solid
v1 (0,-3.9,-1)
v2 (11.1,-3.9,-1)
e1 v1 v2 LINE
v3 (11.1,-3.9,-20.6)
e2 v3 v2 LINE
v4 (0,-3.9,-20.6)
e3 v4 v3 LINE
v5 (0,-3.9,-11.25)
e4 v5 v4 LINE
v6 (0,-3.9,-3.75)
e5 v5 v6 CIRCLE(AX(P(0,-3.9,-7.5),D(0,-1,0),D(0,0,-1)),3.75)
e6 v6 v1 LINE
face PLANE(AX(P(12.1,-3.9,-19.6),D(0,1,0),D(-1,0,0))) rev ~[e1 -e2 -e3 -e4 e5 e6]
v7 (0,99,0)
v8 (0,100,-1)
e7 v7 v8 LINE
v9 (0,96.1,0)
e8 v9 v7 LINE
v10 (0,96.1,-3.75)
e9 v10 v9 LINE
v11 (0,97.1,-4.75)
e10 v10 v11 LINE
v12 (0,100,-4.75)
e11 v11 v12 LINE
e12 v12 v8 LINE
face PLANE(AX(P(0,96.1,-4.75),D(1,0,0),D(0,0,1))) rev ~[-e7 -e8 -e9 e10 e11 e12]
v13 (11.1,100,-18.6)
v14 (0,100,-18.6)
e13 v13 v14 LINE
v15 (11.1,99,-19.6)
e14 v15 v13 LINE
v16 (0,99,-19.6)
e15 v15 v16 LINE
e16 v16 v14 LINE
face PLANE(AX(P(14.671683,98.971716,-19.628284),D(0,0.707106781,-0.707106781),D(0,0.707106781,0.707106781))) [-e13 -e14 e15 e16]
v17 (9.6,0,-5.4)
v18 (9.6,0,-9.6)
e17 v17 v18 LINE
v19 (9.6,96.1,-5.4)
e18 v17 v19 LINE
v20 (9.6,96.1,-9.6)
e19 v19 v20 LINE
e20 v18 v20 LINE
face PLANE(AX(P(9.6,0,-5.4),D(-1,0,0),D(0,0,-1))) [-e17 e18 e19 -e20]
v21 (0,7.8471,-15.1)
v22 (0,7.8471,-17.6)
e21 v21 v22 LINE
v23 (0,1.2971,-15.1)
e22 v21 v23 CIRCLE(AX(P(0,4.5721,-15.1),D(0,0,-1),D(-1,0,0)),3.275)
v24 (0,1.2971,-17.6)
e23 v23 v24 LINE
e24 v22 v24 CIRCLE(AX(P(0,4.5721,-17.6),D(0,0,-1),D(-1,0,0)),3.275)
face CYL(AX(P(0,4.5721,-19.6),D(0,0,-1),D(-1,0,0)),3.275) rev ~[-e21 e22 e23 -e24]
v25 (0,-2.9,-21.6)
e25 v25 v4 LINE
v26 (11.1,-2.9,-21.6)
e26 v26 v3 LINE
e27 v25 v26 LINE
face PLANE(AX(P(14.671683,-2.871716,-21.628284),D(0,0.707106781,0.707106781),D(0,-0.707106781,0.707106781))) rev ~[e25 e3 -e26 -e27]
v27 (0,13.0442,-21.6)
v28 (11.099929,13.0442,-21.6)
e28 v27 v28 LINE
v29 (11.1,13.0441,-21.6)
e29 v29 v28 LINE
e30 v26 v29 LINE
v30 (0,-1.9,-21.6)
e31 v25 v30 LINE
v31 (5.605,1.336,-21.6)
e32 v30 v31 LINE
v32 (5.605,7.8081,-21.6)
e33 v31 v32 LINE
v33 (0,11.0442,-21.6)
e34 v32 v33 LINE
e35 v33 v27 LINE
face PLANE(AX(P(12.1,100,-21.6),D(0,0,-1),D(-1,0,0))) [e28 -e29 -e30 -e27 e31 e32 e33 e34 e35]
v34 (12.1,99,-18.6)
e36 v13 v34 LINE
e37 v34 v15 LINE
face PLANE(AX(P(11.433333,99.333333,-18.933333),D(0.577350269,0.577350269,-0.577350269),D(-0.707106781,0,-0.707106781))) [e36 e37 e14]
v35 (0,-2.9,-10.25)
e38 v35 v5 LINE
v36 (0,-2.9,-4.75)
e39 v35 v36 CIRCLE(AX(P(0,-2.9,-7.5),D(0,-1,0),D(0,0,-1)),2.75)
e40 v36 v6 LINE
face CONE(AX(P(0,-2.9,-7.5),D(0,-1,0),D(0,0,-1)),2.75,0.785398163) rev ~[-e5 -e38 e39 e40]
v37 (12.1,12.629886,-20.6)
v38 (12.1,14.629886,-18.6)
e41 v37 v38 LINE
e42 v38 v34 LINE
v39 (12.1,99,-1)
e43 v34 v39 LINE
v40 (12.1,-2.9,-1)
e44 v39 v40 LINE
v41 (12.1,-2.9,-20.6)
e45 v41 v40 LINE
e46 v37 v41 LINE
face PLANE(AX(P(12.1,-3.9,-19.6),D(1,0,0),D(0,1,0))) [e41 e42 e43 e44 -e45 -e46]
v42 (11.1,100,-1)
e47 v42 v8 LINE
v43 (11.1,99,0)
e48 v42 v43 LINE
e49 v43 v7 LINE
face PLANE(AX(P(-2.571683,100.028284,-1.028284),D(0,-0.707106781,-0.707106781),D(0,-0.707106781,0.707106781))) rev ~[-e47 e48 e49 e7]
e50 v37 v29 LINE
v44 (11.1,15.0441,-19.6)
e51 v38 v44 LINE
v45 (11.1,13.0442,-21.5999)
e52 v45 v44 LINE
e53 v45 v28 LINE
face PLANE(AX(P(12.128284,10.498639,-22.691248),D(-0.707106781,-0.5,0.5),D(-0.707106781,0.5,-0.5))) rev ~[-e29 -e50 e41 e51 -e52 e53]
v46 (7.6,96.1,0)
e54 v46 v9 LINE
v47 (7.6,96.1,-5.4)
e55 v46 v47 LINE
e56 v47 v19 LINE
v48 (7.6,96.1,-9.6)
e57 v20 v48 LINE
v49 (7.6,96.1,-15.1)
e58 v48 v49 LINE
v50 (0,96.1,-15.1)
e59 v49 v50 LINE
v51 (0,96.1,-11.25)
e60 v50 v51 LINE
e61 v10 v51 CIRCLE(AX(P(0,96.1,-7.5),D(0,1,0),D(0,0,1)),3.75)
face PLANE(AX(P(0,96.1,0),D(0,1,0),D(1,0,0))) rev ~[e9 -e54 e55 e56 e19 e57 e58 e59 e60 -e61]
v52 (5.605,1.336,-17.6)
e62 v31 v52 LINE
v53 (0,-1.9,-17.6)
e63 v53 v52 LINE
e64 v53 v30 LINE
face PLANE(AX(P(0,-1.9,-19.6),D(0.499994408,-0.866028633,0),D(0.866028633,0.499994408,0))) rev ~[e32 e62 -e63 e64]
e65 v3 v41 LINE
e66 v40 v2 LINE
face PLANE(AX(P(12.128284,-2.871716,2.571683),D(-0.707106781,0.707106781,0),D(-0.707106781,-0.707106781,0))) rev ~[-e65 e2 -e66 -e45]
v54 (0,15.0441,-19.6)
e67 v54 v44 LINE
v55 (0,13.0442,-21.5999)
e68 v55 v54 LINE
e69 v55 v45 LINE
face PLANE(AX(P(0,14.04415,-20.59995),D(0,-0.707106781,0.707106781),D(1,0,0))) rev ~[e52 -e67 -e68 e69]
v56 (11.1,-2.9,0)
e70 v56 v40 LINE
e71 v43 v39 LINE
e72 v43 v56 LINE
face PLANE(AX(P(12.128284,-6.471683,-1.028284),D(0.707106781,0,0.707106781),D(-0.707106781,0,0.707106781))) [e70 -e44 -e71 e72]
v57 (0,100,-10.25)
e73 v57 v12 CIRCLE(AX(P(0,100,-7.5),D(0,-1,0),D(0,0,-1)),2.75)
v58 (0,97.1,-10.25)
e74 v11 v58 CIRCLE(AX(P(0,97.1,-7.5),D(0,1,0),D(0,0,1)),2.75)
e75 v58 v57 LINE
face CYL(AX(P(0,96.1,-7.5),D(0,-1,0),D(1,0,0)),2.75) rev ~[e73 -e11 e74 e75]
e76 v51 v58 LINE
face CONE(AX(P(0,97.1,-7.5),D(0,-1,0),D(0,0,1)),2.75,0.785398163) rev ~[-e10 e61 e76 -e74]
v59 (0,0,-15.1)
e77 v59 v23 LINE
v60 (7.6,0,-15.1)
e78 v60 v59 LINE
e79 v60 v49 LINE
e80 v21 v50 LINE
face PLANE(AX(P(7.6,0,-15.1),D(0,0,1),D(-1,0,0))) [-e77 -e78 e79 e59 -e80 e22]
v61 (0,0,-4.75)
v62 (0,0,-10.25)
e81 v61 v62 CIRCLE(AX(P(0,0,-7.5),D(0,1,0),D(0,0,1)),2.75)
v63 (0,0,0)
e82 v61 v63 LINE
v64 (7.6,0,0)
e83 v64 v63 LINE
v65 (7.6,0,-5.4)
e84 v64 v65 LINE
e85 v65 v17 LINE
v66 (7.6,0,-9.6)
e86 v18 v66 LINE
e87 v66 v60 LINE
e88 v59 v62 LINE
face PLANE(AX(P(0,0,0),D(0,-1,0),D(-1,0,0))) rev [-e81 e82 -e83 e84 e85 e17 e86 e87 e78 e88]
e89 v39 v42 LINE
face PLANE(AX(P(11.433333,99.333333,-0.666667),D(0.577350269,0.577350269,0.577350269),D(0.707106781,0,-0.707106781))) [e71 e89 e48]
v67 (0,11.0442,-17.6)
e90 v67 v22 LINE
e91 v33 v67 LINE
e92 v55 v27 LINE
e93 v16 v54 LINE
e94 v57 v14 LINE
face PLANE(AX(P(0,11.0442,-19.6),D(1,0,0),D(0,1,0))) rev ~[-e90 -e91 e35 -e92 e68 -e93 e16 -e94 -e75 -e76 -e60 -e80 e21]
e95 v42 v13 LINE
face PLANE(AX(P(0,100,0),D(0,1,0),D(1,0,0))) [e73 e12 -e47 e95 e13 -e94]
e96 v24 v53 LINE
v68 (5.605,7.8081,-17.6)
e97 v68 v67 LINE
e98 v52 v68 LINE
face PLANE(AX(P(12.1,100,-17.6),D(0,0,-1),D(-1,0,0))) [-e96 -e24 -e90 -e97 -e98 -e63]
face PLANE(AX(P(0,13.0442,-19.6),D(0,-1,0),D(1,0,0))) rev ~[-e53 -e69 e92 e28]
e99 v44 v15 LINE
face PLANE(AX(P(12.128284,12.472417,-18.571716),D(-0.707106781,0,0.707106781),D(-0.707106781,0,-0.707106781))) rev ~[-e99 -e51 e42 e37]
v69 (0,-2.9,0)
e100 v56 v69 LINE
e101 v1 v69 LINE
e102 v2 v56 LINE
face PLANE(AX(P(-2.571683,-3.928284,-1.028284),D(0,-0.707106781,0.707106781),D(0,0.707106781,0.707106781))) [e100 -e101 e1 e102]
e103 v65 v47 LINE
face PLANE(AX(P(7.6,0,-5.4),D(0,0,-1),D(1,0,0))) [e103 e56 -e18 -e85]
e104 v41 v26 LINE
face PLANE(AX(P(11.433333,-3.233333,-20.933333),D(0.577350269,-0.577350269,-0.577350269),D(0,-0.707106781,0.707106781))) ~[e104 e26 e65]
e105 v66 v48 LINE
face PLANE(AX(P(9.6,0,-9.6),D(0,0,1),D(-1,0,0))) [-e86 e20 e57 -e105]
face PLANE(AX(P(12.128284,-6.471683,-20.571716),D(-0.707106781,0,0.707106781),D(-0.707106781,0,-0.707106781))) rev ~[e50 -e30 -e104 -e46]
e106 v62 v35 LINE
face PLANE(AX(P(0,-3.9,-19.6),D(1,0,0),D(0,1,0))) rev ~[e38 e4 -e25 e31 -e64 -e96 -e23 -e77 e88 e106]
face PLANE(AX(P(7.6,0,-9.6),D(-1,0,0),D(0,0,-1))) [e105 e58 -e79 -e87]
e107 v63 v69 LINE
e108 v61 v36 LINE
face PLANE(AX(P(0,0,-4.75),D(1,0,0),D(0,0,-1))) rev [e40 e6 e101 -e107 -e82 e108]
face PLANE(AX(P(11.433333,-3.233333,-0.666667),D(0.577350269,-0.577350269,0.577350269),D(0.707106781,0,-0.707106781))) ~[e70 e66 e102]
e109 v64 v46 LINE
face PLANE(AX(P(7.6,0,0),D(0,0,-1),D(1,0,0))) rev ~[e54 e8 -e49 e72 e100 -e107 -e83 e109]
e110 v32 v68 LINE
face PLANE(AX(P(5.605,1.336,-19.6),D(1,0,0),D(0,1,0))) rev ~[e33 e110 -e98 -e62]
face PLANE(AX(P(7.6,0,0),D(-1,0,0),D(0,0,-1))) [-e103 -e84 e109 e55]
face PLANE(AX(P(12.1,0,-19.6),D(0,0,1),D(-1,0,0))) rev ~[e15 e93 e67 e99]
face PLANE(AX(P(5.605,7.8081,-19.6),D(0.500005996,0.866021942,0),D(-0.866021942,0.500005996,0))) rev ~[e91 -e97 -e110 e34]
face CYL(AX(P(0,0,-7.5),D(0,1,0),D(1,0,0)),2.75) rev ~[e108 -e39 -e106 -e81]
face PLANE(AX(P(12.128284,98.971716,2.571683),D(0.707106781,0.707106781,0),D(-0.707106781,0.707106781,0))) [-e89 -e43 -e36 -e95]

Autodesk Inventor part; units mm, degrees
ref_plane "YZ Plane" through (0, 0, 0) normal (1, 0, 0) x (0, 1, 0)
ref_plane "XZ Plane" through (0, 0, 0) normal (0, 1, 0) x (-1, 0, 0)
sketch "Sketch1" plane through (0, 0, 0) normal (0, 1, 0) x (-1, 0, 0)
  line L0 (0, 0) -> (-7.5, 0)
  line L1 (-7.5, -15) -> (0, -15)
  line L2 (0, -15) -> (0, 0)
  line L3 (-7.5, -9.5) -> (-9.5, -9.5)
  line L4 (-9.5, -9.5) -> (-9.5, -5.5)
  line L5 (-9.5, -5.5) -> (-7.5, -5.5)
  line L6 (-7.5, 0) -> (-7.5, -5.5)
  line L7 (-7.5, -9.5) -> (-7.5, -15)
  line L8 (-7.6, -15.1) -> (0.1, -15.1)
  line L9 (0.1, -15.1) -> (0.1, 0.1)
  line L10 (0.1, 0.1) -> (-7.6, 0.1)
  line L11 (-7.6, 0.1) -> (-7.6, -5.4)
  line L12 (-7.6, -5.4) -> (-9.6, -5.4)
  line L13 (-9.6, -5.4) -> (-9.6, -9.6)
  line L14 (-9.6, -9.6) -> (-7.6, -9.6)
  line L15 (-7.6, -9.6) -> (-7.6, -15.1)
  line L16 (0, 0) -> (-12.1, 0)
  line L17 (-12.1, 0) -> (-12.1, -19.6)
  line L18 (-12.1, -19.6) -> (0, -19.6)
  line L19 (0, -19.6) -> (0, 0)
  point P0 (-7.6, 0)
  point P1 (0, -15.1)
  dimension "d2" = 7.5
  dimension "d3" = 15
  dimension "d8" = 4
  dimension "d9" = 2
  dimension "d10" = 5.5
  dimension "d11" = 0.1
  dimension "d12" = 4.5
  dimension "d13" = 4.5
extrude "Extrusion1" add sketch "Sketch1" along normal blind 96.1 contours L11 L12 L13 L14 L15 L8 L19 L18 L17 L16
ref_plane "Work Plane1" through (0, 48.05, 0) normal (0, -1, 0) x (1, 0, 0)
sketch "Sketch2" plane through (0, 96.1, 0) normal (0, 1, 0) x (1, 0, 0)
  line L0 (7.6, 9.6) -> (9.6, 9.6) projected
  line L1 (9.6, 9.6) -> (9.6, 5.4) projected
  line L2 (9.6, 5.4) -> (7.6, 5.4) projected
  line L3 (7.6, 5.4) -> (7.6, 0) projected
  line L4 (7.6, 0) -> (12.1, 0) projected
  line L5 (12.1, 0) -> (12.1, 19.6) projected
  line L6 (12.1, 19.6) -> (0, 19.6) projected
  line L7 (0, 19.6) -> (0, 15.1) projected
  line L8 (0, 15.1) -> (7.6, 15.1) projected
  line L9 (7.6, 15.1) -> (7.6, 9.6) projected
  line L10 (12.1, 0) -> (12.1, 19.6) projected
  line L11 (12.1, 19.6) -> (0, 19.6)
  line L12 (0, 19.6) -> (0, 0)
  line L13 (0, 0) -> (12.1, 0)
  line L14 (12.1, 0) -> (12.1, 19.6)
  circle A0 centre (0, 7.5) radius 2.75
  line L15 (0, 7.5) -> (9.6, 7.5)
  line L16 (9.6, 9.6) -> (9.6, 5.4) projected
  point P0 (0, 10.25)
  point P1 (0, 4.75)
  dimension "d16" = 5.5
extrude "Extrusion2" add sketch "Sketch2" along normal blind 3.9 contours L9 L8 L7 L6 L5 L4 L3 L2 L1 L0 | L0 L1 L15 A0 L12 L8 L9 | L1 L2 L3 L13 L12 A0 L15
mirror "Mirror1" about plane through (0, 48.05, 0) normal (0, -1, 0) of "Extrusion2"
chamfer "Chamfer1" distance 1 angle 45 2 edges at (2.75, 96.1, -7.5) (2.75, -3.9, -7.5)
sketch "Sketch5" plane through (12.1, 100, -19.6) normal (0, 0, -1) x (-1, 0, 0)
  circle A0 centre (12.1, -95.4279) radius 3.275
  line L0 (12.1, -88.9558) -> (17.705, -92.1919)
  line L1 (17.705, -92.1919) -> (17.705, -98.664)
  line L2 (17.705, -98.664) -> (12.1, -101.9)
  line L3 (12.1, -101.9) -> (6.495, -98.664)
  line L4 (6.495, -98.664) -> (6.495, -92.1919)
  line L5 (6.495, -92.1919) -> (12.1, -88.9558)
  line L6 (6.495, -92.1919) -> (17.705, -98.664) construction
  line L7 (17.705, -92.1919) -> (6.495, -98.664) construction
  line L8 (12.1, -103.9) -> (12.1, 0) projected
  dimension "d26" = 6.55
  dimension "d27" = 11.21
  dimension "d48" = 2
extrude "Extrusion3" cut sketch "Sketch5" against normal blind 2
extrude "Extrusion7" cut sketch "Sketch5" against normal through all contours A0 L8 | L8 A0
sketch "Sketch7" plane through (12.1, 100, -19.6) normal (0, 0, -1) x (-1, 0, 0)
  line L0 (0, -103.9) -> (0, 0) projected
  line L1 (12.1, -86.9558) -> (0, -86.9558)
  line L2 (0, -86.9558) -> (0, -103.9)
  line L3 (0, -103.9) -> (12.1, -103.9)
  line L4 (12.1, -103.9) -> (12.1, -86.9558)
  arc A0 (12.1, -92.1529) -> (12.1, -98.7029) centre (12.1, -95.4279) ccw projected
  line L5 (12.1, -88.9558) -> (12.1, -92.1529) projected
  line L6 (6.495, -92.1919) -> (12.1, -88.9558) projected
  line L7 (6.495, -98.664) -> (6.495, -92.1919) projected
  line L8 (12.1, -101.9) -> (6.495, -98.664) projected
  line L9 (12.1, -98.7029) -> (12.1, -101.9) projected
  line L10 (12.1, -88.9558) -> (12.1, 0) projected
  point P0 (12.1, -100)
  point P1 (12.1, -88.9558)
  point P2 (0, -86.9558)
  dimension "d51" = 2
extrude "Extrusion8" add sketch "Sketch7" along normal blind 2 contours L0 L1 L4 L6 L7 L8 L3
chamfer "Chamfer4" distance 2 angle 45 1 edges at (6.05, 13.0442, -19.6)
chamfer "Chamfer3" distance 1 angle 45 10 edges at (6.05, -3.9, 0) (12.1, 100, -9.8) (6.05, 100, -19.6) (6.05, 100, 0) (12.1, 48.05, 0) (12.1, -3.9, -10.8) (6.05, -3.9, -21.6) (12.1, 14.0441, -20.5999) (12.1, 57.522, -19.6) (12.1, 4.5721, -21.6)
properties part number "lead_screw_housing"
